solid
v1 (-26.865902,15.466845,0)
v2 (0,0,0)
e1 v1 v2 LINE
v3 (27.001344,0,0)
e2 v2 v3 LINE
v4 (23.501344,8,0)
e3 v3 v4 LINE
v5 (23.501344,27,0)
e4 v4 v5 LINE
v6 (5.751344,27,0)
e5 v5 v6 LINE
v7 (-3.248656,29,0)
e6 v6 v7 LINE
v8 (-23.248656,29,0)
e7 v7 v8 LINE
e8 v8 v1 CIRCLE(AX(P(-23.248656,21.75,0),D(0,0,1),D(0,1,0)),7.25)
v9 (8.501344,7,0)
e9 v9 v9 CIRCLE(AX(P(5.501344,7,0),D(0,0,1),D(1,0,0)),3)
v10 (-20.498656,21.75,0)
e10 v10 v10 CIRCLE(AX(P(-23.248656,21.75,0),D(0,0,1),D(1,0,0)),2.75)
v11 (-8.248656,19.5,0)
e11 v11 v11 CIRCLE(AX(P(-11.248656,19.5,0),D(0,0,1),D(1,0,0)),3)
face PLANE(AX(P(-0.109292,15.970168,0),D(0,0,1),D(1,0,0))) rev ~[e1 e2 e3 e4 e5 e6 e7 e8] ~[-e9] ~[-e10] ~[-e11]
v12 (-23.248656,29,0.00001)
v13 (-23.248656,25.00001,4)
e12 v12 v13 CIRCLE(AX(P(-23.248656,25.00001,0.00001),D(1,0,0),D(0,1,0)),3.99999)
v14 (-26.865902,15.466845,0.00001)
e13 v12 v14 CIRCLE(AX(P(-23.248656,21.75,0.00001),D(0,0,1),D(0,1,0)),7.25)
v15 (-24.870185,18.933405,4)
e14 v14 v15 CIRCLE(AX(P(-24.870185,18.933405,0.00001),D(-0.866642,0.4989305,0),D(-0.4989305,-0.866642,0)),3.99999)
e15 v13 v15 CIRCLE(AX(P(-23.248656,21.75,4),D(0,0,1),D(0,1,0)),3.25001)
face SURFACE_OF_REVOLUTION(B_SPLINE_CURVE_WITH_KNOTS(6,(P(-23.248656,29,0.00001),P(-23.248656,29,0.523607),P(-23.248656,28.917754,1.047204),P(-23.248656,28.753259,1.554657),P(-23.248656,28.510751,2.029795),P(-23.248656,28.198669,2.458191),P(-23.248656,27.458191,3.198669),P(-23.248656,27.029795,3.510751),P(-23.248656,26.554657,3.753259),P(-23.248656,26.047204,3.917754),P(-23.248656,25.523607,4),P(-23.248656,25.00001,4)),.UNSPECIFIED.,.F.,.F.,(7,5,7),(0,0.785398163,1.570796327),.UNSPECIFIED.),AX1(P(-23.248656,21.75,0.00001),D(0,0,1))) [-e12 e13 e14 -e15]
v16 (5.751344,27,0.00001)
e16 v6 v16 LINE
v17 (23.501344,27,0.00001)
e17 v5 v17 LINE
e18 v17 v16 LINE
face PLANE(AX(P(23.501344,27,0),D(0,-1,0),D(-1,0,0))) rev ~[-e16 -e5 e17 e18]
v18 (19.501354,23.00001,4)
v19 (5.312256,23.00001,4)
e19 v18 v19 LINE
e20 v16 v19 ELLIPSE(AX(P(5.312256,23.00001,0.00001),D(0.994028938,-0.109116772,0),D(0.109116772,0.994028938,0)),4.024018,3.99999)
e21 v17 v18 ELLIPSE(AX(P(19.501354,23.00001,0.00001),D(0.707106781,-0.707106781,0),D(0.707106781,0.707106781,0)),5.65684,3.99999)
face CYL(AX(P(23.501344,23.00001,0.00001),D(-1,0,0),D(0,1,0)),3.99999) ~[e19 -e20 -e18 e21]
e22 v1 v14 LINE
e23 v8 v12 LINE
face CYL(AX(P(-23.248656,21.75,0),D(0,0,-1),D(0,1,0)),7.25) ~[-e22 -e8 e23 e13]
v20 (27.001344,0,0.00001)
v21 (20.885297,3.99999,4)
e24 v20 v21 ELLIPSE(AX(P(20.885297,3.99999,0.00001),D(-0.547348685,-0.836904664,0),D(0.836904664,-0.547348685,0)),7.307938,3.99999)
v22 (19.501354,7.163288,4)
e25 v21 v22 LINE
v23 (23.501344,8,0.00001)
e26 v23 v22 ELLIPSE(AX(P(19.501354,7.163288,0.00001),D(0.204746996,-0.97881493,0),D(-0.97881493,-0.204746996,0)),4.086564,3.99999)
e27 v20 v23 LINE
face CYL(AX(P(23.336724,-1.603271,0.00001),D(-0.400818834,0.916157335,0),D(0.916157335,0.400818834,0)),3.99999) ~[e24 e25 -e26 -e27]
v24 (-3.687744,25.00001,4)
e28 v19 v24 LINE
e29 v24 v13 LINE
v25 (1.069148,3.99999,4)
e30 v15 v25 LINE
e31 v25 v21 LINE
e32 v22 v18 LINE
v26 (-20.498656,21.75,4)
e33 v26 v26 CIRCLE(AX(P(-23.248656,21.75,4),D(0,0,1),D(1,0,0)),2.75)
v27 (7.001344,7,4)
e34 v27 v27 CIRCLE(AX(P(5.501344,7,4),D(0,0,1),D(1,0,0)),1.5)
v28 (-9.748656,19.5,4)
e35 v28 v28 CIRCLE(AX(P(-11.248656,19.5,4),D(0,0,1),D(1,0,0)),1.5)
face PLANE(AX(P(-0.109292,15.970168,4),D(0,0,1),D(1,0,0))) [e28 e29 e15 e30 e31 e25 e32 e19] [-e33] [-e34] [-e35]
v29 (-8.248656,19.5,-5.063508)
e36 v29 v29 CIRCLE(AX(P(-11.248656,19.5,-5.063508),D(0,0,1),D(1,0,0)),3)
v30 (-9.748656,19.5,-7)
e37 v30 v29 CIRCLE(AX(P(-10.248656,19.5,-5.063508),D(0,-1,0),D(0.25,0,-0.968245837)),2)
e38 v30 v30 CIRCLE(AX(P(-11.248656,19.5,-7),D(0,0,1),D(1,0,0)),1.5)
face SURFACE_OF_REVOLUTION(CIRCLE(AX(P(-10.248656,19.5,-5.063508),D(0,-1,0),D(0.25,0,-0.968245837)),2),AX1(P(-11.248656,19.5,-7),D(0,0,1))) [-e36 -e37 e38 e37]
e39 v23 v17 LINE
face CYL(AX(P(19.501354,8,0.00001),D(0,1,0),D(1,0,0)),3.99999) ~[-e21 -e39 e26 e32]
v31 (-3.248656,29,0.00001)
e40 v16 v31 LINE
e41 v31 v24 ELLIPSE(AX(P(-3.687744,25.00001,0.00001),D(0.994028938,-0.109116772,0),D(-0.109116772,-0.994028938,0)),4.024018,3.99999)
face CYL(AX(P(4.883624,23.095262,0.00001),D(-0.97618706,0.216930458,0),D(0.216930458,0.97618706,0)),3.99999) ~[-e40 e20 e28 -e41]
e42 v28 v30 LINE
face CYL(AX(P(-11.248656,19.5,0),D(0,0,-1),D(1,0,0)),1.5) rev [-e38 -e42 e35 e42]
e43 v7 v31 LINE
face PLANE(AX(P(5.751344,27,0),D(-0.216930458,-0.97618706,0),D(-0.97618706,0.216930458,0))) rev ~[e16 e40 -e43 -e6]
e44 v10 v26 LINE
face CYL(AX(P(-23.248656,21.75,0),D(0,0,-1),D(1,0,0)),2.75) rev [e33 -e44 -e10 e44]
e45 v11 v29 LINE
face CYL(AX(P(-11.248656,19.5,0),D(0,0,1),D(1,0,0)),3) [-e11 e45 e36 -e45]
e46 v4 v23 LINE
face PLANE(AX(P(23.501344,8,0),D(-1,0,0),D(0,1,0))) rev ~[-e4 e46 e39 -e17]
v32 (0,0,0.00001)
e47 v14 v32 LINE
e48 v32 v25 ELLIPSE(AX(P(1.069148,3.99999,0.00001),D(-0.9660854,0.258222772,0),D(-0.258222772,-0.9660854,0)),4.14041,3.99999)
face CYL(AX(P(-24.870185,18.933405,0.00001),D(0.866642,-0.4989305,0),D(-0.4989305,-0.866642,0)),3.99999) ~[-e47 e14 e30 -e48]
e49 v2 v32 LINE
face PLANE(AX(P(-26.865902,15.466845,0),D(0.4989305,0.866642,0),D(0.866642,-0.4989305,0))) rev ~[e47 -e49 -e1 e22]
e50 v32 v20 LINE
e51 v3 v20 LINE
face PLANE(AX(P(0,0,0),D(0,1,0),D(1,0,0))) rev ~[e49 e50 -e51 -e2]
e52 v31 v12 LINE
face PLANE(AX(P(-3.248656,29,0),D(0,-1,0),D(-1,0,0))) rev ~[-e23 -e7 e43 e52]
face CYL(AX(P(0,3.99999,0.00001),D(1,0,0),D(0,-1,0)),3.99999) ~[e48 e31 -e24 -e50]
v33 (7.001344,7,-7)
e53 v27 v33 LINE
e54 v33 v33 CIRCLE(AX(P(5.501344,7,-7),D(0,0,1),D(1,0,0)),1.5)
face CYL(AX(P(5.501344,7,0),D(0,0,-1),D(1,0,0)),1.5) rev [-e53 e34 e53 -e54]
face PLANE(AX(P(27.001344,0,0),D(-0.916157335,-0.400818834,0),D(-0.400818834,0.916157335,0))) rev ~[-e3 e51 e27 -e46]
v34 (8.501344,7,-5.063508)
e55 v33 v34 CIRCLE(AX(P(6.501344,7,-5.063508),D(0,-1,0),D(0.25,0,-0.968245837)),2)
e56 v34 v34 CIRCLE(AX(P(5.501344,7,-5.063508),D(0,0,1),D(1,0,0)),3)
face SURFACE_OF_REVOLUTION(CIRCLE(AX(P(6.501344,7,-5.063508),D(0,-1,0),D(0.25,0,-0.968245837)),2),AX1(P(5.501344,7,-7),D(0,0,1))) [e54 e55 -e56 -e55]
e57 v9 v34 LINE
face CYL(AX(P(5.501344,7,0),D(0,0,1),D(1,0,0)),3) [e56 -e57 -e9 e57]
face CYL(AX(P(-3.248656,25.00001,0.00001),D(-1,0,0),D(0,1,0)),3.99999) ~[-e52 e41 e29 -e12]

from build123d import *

# Parameters (mm, degrees)
F0_R     = 3
F0_R_2   = 2.75
F0_R_3   = 1.5
F1_DEPTH = 4
F2_DEPTH = 7
F4_R     = 3.99999


# Not quite as in the source:
# - a fillet or chamfer that OpenCascade refuses, or shapes differently, is made with other operations: its cross-section is extruded or revolved along the edge and cut away or added
# - a fillet or chamfer is up to 0.001 mm smaller than in the source, because OpenCascade refuses the exact size


with BuildPart() as f1:
    # F0 (on Top) → F1 (new body)
    with BuildSketch(Plane.XY):
        with BuildLine():
            Line((0, 0), (23.5013441249, 0))
            Line((23.5013441249, 0), (23.5013441249, 8))
            Line((23.5013441249, 8), (23.5013441249, 27))
            Line((23.5013441249, 27), (5.7513441249, 27))
            Line((5.7513441249, 27), (-3.2486558751, 29))
            Line((-3.2486558751, 29), (-23.2486558751, 29))
            ThreePointArc((-23.2486558751, 29), (-30.2527750248, 23.6221150973), (-26.8659020001, 15.4668455))
            Line((-26.8659020001, 15.4668455), (0, 0))
        make_face()
        with Locations((5.5013441249, 7)):
            Circle(F0_R, mode=Mode.SUBTRACT)
        with Locations((-23.2486558751, 21.75)):
            Circle(F0_R_2, mode=Mode.SUBTRACT)
        with Locations((-11.2486558751, 19.5)):
            Circle(F0_R, mode=Mode.SUBTRACT)
        Polygon((23.5013441249, 8), (23.5013441249, 0), (27.0013441249, 0), align=None)
        with Locations((-11.2486558751, 19.5)):
            Circle(F0_R)
        with Locations((-11.2486558751, 19.5)):
            Circle(F0_R_3, mode=Mode.SUBTRACT)
        with Locations((5.5013441249, 7)):
            Circle(F0_R)
        with Locations((5.5013441249, 7)):
            Circle(F0_R_3, mode=Mode.SUBTRACT)
    extrude(amount=F1_DEPTH)

    # F0 (on Top) → F2 (join)
    with BuildSketch(Plane.XY):
        with Locations((-11.2486558751, 19.5)):
            Circle(F0_R)
        with Locations((-11.2486558751, 19.5)):
            Circle(F0_R_3, mode=Mode.SUBTRACT)
        with Locations((5.5013441249, 7)):
            Circle(F0_R)
        with Locations((5.5013441249, 7)):
            Circle(F0_R_3, mode=Mode.SUBTRACT)
    extrude(amount=-F2_DEPTH)

    # F3: fillet of radius 2 on 2 edges, made by hand

    # F3_s1 → F3_t2 (revolve, cut)
    with BuildSketch(Plane.XZ.offset(-19.5)):
        with BuildLine():
            ThreePointArc((-9.7486558751, -7), (-8.667517045, -6.2882531983), (-8.2486558751, -5.0635083269))
            Line((-8.2486558751, -5.0635083269), (-8.2486558751, -7))
            Line((-8.2486558751, -7), (-9.7486558751, -7))
        make_face()
    revolve(axis=Axis((-11.2486558751, 19.5, -7), (0, 0, 1)), mode=Mode.SUBTRACT)

    # F3_s3 → F3_t4 (revolve, cut)
    with BuildSketch(Plane.XZ.offset(-7)):
        with BuildLine():
            ThreePointArc((7.0013441249, -7), (8.082482955, -6.2882531983), (8.5013441249, -5.0635083269))
            Line((8.5013441249, -5.0635083269), (8.5013441249, -7))
            Line((8.5013441249, -7), (7.0013441249, -7))
        make_face()
    revolve(axis=Axis((5.5013441249, 7, -7), (0, 0, 1)), mode=Mode.SUBTRACT)

    # F4 (radius 4 in the source; OpenCascade refuses exactly that, so slightly less here)
    f4_edges = [f1.edges().sort_by_distance(p)[0] for p in [
        (-13.248656, 29, 4),
        (13.500672, 0, 4),
        (25.251344, 4, 4),
        (23.501344, 17.5, 4),
        (1.251344, 28, 4),
        (14.626344, 27, 4),
        (-13.432951, 7.733423, 4),
        (-30.252775, 23.622115, 4),
    ]]
    fillet(f4_edges, radius=F4_R)


solid = f1.part
